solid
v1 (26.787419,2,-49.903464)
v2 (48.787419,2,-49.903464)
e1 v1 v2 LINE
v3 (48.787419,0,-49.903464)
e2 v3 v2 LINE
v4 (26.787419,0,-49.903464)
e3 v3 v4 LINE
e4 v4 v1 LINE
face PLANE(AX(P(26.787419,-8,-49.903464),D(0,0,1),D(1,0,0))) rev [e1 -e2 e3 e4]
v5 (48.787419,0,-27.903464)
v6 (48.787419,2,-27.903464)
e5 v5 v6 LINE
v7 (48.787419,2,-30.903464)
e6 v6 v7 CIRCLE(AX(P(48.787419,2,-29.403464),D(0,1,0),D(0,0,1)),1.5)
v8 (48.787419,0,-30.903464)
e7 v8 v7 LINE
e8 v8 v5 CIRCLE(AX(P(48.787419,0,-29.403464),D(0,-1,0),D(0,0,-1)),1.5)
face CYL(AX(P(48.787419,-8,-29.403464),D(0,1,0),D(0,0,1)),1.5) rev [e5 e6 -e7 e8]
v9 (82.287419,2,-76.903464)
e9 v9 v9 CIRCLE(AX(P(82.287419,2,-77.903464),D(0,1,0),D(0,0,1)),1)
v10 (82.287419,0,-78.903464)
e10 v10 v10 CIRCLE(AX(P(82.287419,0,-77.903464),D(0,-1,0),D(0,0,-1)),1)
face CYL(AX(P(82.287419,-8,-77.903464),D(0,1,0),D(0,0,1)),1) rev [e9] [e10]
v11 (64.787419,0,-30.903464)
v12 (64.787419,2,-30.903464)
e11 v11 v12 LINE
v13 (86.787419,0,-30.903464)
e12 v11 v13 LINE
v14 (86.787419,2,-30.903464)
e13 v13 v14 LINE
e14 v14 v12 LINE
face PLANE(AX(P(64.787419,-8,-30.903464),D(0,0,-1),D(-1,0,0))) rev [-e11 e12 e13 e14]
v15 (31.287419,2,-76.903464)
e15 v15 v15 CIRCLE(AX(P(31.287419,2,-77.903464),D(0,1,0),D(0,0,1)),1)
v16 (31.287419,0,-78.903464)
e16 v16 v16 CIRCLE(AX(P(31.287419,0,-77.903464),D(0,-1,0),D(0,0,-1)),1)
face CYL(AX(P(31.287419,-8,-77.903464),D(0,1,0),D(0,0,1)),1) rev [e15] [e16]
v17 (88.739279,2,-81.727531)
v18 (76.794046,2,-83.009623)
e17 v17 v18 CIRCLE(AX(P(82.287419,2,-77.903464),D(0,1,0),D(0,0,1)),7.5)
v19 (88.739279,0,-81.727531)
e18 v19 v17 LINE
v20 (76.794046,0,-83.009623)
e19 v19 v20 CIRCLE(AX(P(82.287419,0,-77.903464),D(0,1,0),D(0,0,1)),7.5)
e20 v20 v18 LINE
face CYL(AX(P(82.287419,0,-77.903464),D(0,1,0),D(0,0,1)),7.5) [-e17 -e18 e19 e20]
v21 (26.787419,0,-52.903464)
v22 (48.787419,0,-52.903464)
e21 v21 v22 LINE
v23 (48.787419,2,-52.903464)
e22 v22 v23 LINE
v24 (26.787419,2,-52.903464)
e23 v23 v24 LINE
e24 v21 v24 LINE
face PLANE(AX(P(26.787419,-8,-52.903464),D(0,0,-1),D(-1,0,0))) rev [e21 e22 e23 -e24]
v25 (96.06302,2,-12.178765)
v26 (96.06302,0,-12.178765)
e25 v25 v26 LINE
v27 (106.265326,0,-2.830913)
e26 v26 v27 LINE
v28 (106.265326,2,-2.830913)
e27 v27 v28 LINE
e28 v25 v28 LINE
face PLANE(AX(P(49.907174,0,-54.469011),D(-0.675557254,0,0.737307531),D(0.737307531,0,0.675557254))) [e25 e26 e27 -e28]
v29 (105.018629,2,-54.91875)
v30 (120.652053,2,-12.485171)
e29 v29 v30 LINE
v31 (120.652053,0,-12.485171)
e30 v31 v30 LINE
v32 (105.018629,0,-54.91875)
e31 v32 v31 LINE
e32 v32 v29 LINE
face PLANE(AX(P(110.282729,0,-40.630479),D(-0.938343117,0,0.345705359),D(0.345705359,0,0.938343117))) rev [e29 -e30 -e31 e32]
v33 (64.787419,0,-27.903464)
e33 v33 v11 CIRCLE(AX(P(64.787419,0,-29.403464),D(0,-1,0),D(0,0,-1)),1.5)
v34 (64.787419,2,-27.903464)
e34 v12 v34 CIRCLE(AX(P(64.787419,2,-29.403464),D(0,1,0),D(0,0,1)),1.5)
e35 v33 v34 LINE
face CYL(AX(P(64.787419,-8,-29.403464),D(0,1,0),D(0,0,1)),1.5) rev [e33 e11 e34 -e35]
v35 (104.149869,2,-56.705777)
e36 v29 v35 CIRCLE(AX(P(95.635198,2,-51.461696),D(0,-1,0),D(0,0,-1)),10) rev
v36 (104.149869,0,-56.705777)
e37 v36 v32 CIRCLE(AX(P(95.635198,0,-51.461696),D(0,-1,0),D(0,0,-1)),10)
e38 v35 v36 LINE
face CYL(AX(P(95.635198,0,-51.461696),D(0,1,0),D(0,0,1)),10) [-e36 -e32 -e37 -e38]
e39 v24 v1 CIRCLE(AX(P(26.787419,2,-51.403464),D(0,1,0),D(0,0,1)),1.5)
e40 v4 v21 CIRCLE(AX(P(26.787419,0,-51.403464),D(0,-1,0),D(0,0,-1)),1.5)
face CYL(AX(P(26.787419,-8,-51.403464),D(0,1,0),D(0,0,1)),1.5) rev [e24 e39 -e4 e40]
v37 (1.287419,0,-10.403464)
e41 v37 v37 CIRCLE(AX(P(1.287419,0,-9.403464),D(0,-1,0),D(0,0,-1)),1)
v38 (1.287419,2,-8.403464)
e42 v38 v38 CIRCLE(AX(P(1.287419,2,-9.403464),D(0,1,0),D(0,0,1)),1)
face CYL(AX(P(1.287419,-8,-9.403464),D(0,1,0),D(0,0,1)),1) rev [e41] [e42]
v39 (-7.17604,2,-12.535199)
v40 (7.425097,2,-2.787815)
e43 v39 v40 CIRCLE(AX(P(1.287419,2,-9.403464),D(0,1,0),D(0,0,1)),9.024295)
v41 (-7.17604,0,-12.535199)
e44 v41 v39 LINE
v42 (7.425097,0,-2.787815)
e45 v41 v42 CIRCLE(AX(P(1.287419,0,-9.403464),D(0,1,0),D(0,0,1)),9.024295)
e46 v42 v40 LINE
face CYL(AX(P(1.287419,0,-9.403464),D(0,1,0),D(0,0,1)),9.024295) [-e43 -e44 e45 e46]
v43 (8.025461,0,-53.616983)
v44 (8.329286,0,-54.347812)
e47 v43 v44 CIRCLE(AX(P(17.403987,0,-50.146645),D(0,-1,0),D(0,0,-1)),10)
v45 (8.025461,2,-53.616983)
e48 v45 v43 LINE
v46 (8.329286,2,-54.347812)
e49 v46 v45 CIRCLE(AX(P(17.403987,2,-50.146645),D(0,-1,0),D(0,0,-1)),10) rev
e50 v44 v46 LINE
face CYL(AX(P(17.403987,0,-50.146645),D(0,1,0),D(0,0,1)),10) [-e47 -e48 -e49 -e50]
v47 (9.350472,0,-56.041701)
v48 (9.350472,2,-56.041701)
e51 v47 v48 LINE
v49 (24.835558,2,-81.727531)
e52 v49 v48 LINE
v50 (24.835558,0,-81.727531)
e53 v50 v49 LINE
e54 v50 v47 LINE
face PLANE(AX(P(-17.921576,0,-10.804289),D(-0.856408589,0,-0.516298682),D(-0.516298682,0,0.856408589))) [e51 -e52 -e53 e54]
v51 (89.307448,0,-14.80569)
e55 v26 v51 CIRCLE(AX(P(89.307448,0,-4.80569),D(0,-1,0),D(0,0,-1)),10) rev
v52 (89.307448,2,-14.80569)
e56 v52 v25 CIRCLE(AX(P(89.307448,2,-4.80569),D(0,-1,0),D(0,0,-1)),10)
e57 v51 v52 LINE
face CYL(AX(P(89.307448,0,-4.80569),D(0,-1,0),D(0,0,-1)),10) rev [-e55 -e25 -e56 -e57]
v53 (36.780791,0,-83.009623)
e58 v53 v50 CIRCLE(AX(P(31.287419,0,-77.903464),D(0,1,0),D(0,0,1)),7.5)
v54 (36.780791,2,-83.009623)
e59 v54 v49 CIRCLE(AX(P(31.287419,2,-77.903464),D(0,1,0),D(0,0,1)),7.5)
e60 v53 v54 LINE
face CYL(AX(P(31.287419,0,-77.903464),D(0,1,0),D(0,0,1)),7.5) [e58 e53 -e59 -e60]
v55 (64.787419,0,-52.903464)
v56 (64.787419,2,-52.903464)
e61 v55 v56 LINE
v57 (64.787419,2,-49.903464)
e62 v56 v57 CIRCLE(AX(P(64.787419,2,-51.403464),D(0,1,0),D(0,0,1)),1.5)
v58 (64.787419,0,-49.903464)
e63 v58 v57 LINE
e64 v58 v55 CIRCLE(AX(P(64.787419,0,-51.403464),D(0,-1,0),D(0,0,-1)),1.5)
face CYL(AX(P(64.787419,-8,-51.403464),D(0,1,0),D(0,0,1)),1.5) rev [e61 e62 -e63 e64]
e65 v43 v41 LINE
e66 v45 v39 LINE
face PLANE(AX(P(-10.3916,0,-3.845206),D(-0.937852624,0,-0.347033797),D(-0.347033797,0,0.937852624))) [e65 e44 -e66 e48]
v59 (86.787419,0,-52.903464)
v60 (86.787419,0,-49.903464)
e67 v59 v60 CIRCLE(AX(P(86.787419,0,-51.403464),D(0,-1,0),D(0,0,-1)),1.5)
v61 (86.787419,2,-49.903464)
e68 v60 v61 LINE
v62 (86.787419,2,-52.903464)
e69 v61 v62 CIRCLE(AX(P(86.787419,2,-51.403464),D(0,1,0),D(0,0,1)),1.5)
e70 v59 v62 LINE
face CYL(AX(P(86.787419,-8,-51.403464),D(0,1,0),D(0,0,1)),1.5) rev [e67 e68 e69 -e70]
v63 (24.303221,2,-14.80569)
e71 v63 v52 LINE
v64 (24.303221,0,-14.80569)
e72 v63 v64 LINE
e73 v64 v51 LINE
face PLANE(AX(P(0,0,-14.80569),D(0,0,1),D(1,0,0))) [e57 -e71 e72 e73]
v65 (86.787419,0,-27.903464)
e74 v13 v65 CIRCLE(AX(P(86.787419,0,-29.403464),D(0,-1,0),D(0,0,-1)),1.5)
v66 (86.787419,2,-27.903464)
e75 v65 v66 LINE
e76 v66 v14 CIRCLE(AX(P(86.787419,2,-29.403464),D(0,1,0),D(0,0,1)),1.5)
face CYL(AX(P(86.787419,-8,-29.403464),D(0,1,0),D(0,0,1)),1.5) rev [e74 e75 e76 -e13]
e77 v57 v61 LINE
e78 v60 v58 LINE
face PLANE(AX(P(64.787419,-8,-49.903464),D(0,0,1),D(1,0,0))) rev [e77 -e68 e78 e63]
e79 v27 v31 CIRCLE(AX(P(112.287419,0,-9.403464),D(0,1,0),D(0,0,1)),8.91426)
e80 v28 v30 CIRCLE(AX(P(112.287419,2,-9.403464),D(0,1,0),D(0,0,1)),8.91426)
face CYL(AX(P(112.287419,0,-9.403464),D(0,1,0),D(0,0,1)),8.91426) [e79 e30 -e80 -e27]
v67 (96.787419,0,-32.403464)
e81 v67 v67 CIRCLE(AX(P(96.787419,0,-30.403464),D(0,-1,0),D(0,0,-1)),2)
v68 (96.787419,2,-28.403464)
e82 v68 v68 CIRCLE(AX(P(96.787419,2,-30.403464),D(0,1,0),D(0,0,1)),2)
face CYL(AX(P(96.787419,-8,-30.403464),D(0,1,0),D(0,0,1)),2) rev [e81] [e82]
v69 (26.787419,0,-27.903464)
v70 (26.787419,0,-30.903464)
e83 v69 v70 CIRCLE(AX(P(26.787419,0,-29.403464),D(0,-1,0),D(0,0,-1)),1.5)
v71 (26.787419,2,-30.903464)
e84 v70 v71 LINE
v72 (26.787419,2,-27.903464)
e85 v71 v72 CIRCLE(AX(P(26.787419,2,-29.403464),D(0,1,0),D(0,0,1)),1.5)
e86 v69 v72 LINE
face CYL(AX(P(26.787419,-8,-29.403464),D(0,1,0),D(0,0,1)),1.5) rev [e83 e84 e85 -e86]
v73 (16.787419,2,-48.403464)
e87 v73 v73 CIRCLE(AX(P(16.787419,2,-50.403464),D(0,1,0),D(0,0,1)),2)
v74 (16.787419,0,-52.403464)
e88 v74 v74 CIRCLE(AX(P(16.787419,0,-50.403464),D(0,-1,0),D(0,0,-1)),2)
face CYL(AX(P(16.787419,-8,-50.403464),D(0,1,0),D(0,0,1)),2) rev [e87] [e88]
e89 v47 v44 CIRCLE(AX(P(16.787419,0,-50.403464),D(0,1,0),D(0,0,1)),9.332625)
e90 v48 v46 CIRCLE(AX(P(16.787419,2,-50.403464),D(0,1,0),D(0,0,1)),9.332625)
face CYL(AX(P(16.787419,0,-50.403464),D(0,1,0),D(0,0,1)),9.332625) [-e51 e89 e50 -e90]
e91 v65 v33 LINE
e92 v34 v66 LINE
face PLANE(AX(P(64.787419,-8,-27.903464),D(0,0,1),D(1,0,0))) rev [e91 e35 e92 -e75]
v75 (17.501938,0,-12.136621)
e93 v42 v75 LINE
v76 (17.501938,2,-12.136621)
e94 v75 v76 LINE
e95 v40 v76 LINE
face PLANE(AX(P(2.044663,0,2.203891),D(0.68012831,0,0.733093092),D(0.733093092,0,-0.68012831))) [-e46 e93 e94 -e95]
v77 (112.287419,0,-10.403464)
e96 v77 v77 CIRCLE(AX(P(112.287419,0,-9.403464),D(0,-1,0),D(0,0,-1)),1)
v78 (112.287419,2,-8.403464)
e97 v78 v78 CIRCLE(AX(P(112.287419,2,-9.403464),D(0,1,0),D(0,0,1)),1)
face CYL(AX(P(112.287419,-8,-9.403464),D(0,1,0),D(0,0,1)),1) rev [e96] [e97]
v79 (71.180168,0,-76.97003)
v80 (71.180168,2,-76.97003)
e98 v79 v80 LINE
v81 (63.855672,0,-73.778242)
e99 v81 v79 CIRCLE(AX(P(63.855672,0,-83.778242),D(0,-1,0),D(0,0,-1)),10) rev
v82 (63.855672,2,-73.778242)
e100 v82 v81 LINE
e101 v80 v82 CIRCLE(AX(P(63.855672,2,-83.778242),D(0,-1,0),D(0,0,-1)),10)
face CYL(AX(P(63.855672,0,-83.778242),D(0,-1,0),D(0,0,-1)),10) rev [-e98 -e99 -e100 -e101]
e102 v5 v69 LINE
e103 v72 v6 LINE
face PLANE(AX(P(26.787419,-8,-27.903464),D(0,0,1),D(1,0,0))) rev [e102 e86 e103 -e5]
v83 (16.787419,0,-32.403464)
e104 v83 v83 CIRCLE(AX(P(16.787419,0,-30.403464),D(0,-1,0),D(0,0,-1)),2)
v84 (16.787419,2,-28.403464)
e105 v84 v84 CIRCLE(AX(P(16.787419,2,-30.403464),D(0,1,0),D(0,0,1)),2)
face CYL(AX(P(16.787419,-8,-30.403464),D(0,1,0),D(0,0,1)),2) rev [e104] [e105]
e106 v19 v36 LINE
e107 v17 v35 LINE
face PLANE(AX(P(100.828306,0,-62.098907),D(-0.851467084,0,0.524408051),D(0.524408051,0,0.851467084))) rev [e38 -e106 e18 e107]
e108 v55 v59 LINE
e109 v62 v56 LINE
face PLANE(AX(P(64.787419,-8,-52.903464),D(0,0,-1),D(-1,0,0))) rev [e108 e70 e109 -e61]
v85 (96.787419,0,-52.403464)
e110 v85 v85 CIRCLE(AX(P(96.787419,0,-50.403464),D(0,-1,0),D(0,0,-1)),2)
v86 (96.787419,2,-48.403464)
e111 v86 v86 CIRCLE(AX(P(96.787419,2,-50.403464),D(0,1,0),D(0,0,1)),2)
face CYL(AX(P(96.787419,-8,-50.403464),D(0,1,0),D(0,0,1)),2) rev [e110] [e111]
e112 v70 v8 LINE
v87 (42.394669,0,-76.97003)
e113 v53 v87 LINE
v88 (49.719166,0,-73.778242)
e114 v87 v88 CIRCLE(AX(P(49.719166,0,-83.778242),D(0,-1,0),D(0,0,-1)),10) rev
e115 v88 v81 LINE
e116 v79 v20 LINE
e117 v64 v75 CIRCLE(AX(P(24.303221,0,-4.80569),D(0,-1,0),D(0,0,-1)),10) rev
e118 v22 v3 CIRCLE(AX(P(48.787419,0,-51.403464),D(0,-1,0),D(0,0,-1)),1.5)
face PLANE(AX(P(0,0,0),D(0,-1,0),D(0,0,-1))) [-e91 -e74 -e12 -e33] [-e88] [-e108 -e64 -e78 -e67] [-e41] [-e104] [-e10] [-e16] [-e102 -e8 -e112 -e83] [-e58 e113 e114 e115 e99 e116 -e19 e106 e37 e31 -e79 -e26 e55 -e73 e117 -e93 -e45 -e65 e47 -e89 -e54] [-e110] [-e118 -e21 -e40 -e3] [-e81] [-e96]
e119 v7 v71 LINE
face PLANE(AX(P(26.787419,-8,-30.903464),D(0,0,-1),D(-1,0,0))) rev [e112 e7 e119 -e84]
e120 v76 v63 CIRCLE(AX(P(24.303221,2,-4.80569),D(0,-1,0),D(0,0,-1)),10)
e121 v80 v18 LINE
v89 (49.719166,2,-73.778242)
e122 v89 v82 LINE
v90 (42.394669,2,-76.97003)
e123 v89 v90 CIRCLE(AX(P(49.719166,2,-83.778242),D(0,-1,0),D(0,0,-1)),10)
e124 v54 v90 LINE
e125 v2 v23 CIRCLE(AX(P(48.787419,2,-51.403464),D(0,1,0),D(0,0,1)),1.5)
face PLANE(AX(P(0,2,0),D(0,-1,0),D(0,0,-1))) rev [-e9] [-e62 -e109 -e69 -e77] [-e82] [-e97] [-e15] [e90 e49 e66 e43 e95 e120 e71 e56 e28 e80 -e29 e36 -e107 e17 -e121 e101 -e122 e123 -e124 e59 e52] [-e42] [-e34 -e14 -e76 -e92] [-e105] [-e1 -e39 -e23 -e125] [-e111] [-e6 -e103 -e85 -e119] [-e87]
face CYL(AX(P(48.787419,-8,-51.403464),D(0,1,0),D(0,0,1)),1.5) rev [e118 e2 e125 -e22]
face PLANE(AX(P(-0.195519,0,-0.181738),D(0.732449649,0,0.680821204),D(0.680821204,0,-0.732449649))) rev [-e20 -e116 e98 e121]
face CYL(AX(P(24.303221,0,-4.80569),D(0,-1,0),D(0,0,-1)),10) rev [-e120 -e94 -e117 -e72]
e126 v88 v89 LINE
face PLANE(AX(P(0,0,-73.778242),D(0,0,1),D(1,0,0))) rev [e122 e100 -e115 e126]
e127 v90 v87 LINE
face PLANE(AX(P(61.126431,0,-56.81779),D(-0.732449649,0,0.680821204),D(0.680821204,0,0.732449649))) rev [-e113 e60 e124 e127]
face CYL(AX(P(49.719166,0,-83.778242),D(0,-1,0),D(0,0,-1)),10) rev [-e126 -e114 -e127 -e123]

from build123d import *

# Parameters (mm, degrees)
SKETCH1_W           = 130
SKETCH1_H           = 90
BOSS_EXTRUDE2_DEPTH = 2
SKETCH2_R           = 2
CUT_EXTRUDE1_DEPTH  = 10
CUT_EXTRUDE3_DEPTH  = 10
SKETCH5_R           = 1
CUT_EXTRUDE4_DEPTH  = 10
CUT_EXTRUDE5_DEPTH  = 149.761308663
FILLET1_R           = 10


with BuildPart() as part:
    # Sketch1 → Boss-Extrude2 (new body)
    with BuildSketch(Plane(origin=(0, 0, 0), x_dir=(1, 0, 0), z_dir=(0, 1, 0))):
        with Locations((56.787418592, 40.403463793)):
            Rectangle(SKETCH1_W, SKETCH1_H)
    extrude(amount=BOSS_EXTRUDE2_DEPTH)

    # Sketch2 → Cut-Extrude1 (cut)
    with BuildSketch(Plane(origin=(0, 2, 0), x_dir=(1, 0, 0), z_dir=(0, 1, 0))):
        with Locations(Location((16.787418592, 50.403463793, 0), (0, 0, 270))):
            Circle(SKETCH2_R)
        with Locations(Location((16.787418592, 30.403463793, 0), (0, 0, 270))):
            Circle(SKETCH2_R)
        with Locations(Location((96.787418592, 50.403463793, 0), (0, 0, 270))):
            Circle(SKETCH2_R)
        with Locations(Location((96.787418592, 30.403463793, 0), (0, 0, 270))):
            Circle(SKETCH2_R)
    extrude(amount=-CUT_EXTRUDE1_DEPTH, mode=Mode.SUBTRACT)

    # Sketch4 → Cut-Extrude3 (cut)
    with BuildSketch(Plane(origin=(0, 2, 0), x_dir=(1, 0, 0), z_dir=(0, 1, 0))):
        with BuildLine():
            Line((26.787418592, 52.903463793), (48.787418592, 52.903463793))
            ThreePointArc((48.787418592, 52.903463793), (50.287418592, 51.403463793), (48.787418592, 49.903463793))
            Line((48.787418592, 49.903463793), (26.787418592, 49.903463793))
            ThreePointArc((26.787418592, 49.903463793), (25.287418592, 51.403463793), (26.787418592, 52.903463793))
        make_face()
        with BuildLine():
            Line((26.787418592, 30.903463793), (48.787418592, 30.903463793))
            ThreePointArc((48.787418592, 30.903463793), (50.287418592, 29.403463793), (48.787418592, 27.903463793))
            Line((48.787418592, 27.903463793), (26.787418592, 27.903463793))
            ThreePointArc((26.787418592, 27.903463793), (25.287418592, 29.403463793), (26.787418592, 30.903463793))
        make_face()
        with BuildLine():
            Line((64.787418592, 52.903463793), (86.787418592, 52.903463793))
            ThreePointArc((86.787418592, 52.903463793), (88.287418592, 51.403463793), (86.787418592, 49.903463793))
            Line((86.787418592, 49.903463793), (64.787418592, 49.903463793))
            ThreePointArc((64.787418592, 49.903463793), (63.287418592, 51.403463793), (64.787418592, 52.903463793))
        make_face()
        with BuildLine():
            Line((64.787418592, 30.903463793), (86.787418592, 30.903463793))
            ThreePointArc((86.787418592, 30.903463793), (88.287418592, 29.403463793), (86.787418592, 27.903463793))
            Line((86.787418592, 27.903463793), (64.787418592, 27.903463793))
            ThreePointArc((64.787418592, 27.903463793), (63.287418592, 29.403463793), (64.787418592, 30.903463793))
        make_face()
    extrude(amount=-CUT_EXTRUDE3_DEPTH, mode=Mode.SUBTRACT)

    # Sketch5 → Cut-Extrude4 (cut)
    with BuildSketch(Plane(origin=(0, 2, 0), x_dir=(1, 0, 0), z_dir=(0, 1, 0))):
        with Locations(Location((1.287418592, 9.403463793, 0), (0, 0, 270))):
            Circle(SKETCH5_R)
        with Locations(Location((112.287418592, 9.403463793, 0), (0, 0, 270))):
            Circle(SKETCH5_R)
        with Locations(Location((31.287418592, 77.903463793, 0), (0, 0, 270))):
            Circle(SKETCH5_R)
        with Locations(Location((82.287418592, 77.903463793, 0), (0, 0, 270))):
            Circle(SKETCH5_R)
    extrude(amount=-CUT_EXTRUDE4_DEPTH, mode=Mode.SUBTRACT)

    # Sketch6 → Cut-Extrude5 (cut, through all)
    with BuildSketch(Plane(origin=(0, 2, 0), x_dir=(1, 0, 0), z_dir=(0, 1, 0))):
        with BuildLine():
            Line((31.28741871, 85.403463793), (-8.212581408, 85.403463793))
            Line((-8.212581408, 85.403463793), (-8.212581408, -4.596536207))
            Line((-8.212581408, -4.596536207), (121.787418592, -4.596536207))
            Line((121.787418592, -4.596536207), (121.787418592, 85.403463793))
            Line((121.787418592, 85.403463793), (82.287418592, 85.403463793))
            ThreePointArc((82.287418592, 85.403463793), (86.000200188, 84.420000667), (88.739279438, 81.727531213))
            Line((88.739279438, 81.727531213), (104.673461226, 55.855633786))
            Line((104.673461226, 55.855633786), (120.652052787, 12.485170978))
            ThreePointArc((120.652052787, 12.485170978), (117.254615907, 2.001371169), (106.265325845, 2.830913046))
            Line((106.265325845, 2.830913046), (93.195977552, 14.805689748))
            Line((93.195977552, 14.805689748), (20.378859632, 14.805689748))
            Line((20.378859632, 14.805689748), (7.425097101, 2.787815466))
            ThreePointArc((7.425097103, 2.787815464), (-3.723088928, 1.897951505), (-7.176040156, 12.53519915))
            Line((-7.176040154, 12.53519915), (8.242814409, 54.204377623))
            Line((8.242814409, 54.204377623), (8.329286173, 54.347812353))
            ThreePointArc((8.329286173, 54.347812353), (8.794878375, 55.221885781), (9.350471922, 56.041700557))
            Line((9.350471922, 56.041700557), (24.835557745, 81.727531213))
            ThreePointArc((24.835557746, 81.727531212), (27.574637047, 84.420000696), (31.28741871, 85.403463793))
        make_face()
        with BuildLine():
            Line((82.287418592, 85.403463793), (31.28741871, 85.403463793))
            ThreePointArc((31.28741871, 85.403463793), (34.283566781, 84.779007119), (36.780790962, 83.00962282))
            Line((36.780790963, 83.009622821), (45.361476392, 73.77824166))
            Line((45.361476392, 73.77824166), (68.213360792, 73.77824166))
            Line((68.213360792, 73.77824166), (76.794046223, 83.009622821))
            ThreePointArc((76.794046223, 83.009622821), (79.291270457, 84.779007143), (82.287418592, 85.403463793))
        make_face()
    extrude(amount=-CUT_EXTRUDE5_DEPTH, mode=Mode.SUBTRACT)

    # Fillet1
    # the kernel refuses this fillet: 10 mm, written as the material it adds along each edge
    with BuildSketch(Plane(origin=(45.361476392, 2, -73.77824166), x_dir=(1, 0, 0), z_dir=(0, -1, 0))) as fillet1_piece_1:
        with BuildLine():
            CenterArc((FILLET1_R * 0.435768925154, -FILLET1_R), FILLET1_R, 90, 47.092151835)
            Line((-FILLET1_R * 0.296680724118, -FILLET1_R * 0.319178796393), (0, 0))
            Line((0, 0), (FILLET1_R * 0.435768925154, 0))
        make_face()
    extrude(amount=2)
    with BuildSketch(Plane(origin=(68.213360792, 2, -73.77824166), x_dir=(-1, 0, 0), z_dir=(0, -1, 0))) as fillet1_piece_2:
        with BuildLine():
            CenterArc((FILLET1_R * 0.435768925095, FILLET1_R), FILLET1_R, 222.907848171, 47.092151829)
            Line((-FILLET1_R * 0.296680724109, FILLET1_R * 0.31917879632), (0, 0))
            Line((0, 0), (FILLET1_R * 0.435768925095, 0))
        make_face()
    extrude(amount=2)
    with BuildSketch(Plane(origin=(93.195977552, 2, -14.805689748), x_dir=(0.7373075314629184, 0, 0.6755572544559473), z_dir=(0, -1, 0))) as fillet1_piece_3:
        with BuildLine():
            CenterArc((FILLET1_R * 0.388853005137, FILLET1_R), FILLET1_R, 227.502560825, 42.497439175)
            Line((-FILLET1_R * 0.286704249319, FILLET1_R * 0.262692468537), (0, 0))
            Line((0, 0), (FILLET1_R * 0.388853005137, 0))
        make_face()
    extrude(amount=2)
    with BuildSketch(Plane(origin=(20.378859632, 2, -14.805689748), x_dir=(1, 0, 0), z_dir=(0, -1, 0))) as fillet1_piece_4:
        with BuildLine():
            CenterArc((FILLET1_R * 0.392436109253, FILLET1_R), FILLET1_R, 227.146329541, 42.853670459)
            Line((-FILLET1_R * 0.287692200824, FILLET1_R * 0.2669069078), (0, 0))
            Line((0, 0), (FILLET1_R * 0.392436109253, 0))
        make_face()
    extrude(amount=2)
    # the kernel refuses this fillet: 10 mm, written as the material it takes off along each edge
    with BuildSketch(Plane(origin=(104.673461226, 4.496112329, -55.855633786), x_dir=(0.3457053588273583, 0, 0.9383431168171094), z_dir=(0, -1, 0))) as fillet1_2_piece_1:
        with BuildLine():
            CenterArc((FILLET1_R * 0.0998444931431, FILLET1_R), FILLET1_R, 258.596457336, 11.403542664)
            Line((-FILLET1_R * 0.0978734581483, FILLET1_R * 0.019741048632), (0, 0))
            Line((0, 0), (FILLET1_R * 0.0998444931431, 0))
        make_face()
    extrude(amount=6.992224657, mode=Mode.SUBTRACT)
    with BuildSketch(Plane(origin=(8.242814409, 3.565796653, -54.204377623), x_dir=(0.516298681525034, 0, -0.8564085890832199), z_dir=(0, -1, 0))) as fillet1_2_piece_2:
        with BuildLine():
            CenterArc((1.254824259, 9.940708785), FILLET1_R, 259.221695576, 4.53596152)
            Line((-0.615269231, 0.117127445), (0, 0))
            Line((0, 0), (0.167483992, 0))
        make_face()
    extrude(amount=5.131593306, mode=Mode.SUBTRACT)


solid = part.part
